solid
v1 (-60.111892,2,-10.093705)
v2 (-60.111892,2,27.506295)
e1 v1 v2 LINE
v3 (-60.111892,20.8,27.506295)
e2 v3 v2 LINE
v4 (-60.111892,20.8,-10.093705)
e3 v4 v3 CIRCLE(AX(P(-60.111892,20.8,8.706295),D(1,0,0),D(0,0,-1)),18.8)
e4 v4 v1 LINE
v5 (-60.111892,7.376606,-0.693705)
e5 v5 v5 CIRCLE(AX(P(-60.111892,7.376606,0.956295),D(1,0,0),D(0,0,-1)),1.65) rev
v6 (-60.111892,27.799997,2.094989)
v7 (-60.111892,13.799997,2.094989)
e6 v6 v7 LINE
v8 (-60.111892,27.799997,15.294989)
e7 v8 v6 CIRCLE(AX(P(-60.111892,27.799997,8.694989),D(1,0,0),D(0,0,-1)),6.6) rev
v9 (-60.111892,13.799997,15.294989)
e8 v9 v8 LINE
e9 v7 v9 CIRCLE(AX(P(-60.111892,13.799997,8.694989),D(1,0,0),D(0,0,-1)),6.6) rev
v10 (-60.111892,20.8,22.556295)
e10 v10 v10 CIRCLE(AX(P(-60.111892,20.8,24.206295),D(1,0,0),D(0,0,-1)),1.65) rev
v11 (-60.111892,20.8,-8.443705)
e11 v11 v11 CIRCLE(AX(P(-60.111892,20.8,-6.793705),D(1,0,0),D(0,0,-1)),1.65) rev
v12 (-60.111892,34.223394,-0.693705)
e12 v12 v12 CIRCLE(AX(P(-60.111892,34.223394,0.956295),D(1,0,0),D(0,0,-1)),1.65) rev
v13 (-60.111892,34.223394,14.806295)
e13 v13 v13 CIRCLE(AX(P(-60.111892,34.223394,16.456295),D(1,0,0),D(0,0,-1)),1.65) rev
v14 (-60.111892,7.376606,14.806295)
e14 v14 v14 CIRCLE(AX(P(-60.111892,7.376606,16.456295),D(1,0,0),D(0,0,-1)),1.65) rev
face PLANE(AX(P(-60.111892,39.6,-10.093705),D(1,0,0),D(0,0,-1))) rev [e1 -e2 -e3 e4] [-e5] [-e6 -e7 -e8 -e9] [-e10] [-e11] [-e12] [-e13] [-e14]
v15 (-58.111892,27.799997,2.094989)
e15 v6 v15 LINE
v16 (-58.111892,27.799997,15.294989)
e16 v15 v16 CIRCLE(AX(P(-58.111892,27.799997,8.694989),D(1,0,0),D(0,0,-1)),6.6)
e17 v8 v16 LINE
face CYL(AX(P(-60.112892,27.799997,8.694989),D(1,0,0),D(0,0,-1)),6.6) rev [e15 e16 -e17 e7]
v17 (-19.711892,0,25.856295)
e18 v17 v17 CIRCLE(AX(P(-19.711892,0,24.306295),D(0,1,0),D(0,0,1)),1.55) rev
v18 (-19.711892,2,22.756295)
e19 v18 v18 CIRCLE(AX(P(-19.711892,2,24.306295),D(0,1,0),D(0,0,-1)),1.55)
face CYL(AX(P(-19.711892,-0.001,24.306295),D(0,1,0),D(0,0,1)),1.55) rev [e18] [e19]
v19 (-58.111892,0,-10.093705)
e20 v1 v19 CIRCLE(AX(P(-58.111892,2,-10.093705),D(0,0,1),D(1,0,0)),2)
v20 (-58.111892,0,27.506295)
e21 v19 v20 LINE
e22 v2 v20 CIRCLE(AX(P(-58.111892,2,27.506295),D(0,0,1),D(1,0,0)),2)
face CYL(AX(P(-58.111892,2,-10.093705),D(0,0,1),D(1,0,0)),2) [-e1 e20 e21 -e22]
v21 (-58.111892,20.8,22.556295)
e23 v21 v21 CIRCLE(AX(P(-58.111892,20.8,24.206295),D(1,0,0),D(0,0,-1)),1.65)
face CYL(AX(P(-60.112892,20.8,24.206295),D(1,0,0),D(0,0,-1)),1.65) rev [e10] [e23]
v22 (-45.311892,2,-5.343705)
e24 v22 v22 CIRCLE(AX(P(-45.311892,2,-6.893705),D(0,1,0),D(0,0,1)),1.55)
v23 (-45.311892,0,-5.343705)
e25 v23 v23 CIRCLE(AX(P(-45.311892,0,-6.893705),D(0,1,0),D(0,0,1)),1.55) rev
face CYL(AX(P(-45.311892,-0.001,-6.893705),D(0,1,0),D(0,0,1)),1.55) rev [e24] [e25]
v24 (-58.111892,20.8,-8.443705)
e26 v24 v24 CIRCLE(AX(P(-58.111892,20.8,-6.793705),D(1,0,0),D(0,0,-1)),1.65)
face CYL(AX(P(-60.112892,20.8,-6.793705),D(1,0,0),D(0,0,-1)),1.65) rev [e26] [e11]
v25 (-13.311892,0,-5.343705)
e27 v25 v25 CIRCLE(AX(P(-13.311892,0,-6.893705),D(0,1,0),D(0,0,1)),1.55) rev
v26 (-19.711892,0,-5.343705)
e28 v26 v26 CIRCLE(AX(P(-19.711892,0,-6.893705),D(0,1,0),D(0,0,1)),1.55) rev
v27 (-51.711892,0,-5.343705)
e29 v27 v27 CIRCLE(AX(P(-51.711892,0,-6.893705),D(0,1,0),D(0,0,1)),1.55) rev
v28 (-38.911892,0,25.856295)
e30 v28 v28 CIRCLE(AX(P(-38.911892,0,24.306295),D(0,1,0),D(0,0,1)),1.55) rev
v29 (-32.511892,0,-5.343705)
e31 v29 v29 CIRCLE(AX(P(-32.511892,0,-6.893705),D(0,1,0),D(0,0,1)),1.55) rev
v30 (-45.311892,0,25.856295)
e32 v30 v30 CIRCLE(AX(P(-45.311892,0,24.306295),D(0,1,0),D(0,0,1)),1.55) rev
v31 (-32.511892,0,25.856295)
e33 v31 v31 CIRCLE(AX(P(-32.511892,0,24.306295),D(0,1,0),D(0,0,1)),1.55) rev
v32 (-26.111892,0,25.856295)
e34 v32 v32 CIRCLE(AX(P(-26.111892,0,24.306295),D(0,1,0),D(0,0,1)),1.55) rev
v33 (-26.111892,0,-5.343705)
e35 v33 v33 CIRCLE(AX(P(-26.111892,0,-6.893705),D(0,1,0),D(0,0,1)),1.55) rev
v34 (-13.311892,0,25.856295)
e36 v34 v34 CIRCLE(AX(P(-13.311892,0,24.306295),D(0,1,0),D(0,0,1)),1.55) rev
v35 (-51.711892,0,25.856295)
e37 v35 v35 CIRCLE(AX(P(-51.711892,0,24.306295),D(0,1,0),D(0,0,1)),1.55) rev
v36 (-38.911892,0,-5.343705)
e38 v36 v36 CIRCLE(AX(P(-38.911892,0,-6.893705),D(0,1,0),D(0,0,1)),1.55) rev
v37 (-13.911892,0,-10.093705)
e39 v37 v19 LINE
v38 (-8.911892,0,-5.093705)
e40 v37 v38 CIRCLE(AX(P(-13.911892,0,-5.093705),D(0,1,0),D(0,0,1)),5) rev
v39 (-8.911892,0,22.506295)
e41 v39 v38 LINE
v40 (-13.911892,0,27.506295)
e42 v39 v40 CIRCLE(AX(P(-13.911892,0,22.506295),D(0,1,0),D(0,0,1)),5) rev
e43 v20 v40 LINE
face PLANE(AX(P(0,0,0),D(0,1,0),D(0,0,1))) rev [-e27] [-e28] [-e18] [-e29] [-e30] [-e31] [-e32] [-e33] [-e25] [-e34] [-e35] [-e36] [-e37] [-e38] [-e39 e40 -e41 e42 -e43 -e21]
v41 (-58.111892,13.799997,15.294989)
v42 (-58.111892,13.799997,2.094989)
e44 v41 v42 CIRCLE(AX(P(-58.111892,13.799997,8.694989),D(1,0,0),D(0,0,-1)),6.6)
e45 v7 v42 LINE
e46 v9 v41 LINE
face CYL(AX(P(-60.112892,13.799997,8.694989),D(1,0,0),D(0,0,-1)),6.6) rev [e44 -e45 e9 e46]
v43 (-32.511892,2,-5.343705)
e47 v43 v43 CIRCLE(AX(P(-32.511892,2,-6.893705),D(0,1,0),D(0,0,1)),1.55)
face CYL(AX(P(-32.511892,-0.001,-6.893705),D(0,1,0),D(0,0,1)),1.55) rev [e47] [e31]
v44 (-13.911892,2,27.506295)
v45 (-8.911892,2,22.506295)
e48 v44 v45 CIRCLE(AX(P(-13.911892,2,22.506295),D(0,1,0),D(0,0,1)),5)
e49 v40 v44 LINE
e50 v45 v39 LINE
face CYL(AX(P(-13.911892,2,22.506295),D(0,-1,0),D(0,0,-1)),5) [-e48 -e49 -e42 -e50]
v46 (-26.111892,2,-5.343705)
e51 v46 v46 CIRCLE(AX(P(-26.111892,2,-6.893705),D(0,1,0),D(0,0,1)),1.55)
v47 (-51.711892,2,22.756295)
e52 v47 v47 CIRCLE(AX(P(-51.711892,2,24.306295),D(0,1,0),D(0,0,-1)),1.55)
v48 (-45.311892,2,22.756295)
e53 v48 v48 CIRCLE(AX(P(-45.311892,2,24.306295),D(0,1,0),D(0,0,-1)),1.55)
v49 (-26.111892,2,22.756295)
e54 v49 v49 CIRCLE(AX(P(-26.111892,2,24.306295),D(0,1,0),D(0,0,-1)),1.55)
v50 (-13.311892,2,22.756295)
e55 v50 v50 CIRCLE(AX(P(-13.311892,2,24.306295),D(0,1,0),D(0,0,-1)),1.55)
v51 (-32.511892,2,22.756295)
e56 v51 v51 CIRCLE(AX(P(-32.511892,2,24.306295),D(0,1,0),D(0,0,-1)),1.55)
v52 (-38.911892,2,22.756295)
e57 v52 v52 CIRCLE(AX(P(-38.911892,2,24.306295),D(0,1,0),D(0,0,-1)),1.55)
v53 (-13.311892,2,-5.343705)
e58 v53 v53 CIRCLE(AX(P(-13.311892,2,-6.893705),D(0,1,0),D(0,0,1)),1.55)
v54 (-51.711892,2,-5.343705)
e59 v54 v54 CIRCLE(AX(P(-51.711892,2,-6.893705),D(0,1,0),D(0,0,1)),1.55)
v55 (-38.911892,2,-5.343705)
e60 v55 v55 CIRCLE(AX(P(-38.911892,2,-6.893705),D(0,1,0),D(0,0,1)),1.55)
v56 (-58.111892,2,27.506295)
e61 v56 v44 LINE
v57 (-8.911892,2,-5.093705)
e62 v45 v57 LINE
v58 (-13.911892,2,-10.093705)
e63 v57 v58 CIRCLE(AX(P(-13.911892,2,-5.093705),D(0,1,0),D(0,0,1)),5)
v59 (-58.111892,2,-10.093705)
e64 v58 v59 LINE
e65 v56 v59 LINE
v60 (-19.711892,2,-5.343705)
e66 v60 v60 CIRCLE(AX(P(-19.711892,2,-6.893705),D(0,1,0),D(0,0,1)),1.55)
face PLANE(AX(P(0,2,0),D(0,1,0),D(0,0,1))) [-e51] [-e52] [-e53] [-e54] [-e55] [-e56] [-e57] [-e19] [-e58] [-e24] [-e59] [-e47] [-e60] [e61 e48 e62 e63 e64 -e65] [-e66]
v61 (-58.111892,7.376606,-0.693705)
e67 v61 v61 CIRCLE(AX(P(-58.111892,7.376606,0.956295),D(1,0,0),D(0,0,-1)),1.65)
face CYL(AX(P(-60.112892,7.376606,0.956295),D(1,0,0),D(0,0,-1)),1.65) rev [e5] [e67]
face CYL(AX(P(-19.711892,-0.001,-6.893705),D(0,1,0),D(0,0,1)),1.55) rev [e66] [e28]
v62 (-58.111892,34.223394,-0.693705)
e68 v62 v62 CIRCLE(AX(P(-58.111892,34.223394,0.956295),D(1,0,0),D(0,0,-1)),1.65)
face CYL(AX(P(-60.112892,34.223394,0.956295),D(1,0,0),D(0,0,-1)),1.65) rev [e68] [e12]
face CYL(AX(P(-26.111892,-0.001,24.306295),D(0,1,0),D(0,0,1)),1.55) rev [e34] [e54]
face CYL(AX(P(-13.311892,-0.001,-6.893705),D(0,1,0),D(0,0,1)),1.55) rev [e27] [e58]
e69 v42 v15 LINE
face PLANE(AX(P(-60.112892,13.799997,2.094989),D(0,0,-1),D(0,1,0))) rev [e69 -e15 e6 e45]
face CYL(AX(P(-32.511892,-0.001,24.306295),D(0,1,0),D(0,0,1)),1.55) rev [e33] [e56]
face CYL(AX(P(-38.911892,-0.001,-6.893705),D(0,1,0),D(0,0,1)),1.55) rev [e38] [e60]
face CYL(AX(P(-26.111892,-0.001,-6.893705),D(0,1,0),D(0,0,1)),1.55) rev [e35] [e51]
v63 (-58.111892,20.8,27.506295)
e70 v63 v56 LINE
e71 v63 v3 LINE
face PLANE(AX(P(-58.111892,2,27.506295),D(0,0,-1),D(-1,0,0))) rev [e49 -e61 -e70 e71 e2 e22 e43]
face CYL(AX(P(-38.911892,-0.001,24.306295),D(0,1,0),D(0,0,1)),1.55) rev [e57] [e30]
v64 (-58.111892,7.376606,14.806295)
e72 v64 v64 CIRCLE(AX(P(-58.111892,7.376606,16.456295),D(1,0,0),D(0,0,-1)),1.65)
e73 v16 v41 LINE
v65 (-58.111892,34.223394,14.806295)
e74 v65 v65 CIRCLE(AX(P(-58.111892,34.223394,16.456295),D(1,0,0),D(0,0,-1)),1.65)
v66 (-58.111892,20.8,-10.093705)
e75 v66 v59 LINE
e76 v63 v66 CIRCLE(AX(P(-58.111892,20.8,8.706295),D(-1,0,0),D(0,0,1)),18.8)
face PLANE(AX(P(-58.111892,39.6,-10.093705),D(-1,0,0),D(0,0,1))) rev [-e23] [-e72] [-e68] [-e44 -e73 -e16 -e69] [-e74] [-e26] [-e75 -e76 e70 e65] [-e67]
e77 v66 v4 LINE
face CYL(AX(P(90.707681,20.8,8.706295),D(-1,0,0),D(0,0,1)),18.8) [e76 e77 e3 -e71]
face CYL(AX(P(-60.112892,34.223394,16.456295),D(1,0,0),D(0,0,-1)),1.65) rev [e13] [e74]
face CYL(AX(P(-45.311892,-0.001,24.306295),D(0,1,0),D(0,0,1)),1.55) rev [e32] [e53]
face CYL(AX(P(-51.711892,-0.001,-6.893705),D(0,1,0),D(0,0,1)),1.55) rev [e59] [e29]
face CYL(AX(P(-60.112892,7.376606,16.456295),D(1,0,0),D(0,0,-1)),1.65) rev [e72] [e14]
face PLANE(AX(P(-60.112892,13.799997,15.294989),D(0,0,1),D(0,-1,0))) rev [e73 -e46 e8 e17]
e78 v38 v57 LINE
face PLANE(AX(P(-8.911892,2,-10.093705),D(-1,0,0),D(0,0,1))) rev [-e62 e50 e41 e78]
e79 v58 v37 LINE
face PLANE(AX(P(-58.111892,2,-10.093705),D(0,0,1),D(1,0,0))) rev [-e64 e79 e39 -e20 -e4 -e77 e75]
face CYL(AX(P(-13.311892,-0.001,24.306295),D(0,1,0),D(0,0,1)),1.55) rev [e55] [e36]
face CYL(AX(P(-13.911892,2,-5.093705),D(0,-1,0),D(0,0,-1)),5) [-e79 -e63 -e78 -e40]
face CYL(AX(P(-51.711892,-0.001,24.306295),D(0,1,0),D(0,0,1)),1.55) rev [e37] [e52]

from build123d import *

# Parameters (mm, degrees)
SKETCH1_W           = 49.2
SKETCH1_H           = 37.6
BOSS_EXTRUDE1_DEPTH = 2
SKETCH2_W           = 2
SKETCH2_H           = 37.6
BOSS_EXTRUDE2_DEPTH = 37.6
BOSS_EXTRUDE5_DEPTH = 37.6
CUT_EXTRUDE1_REACH  = 78.051
SKETCH4_R           = 1.55
FILLET2_R           = 5
CUT_EXTRUDE2_REACH  = 70.887
SKETCH5_R           = 1.65
CUT_EXTRUDE3_START  = -2
CUT_EXTRUDE3_DEPTH  = 2
CUT_EXTRUDE4_REACH  = 70.887


# Read off the part's stored shape, not the designer's step: Cut-Extrude3
with BuildPart() as part:
    # Sketch1 → Boss-Extrude1 (new body)
    with BuildSketch(Plane(origin=(0, 0, 0), x_dir=(1, 0, 0), z_dir=(0, 1, 0))):
        with Locations((-33.511891694, -8.706295402)):
            Rectangle(SKETCH1_W, SKETCH1_H)
    extrude(amount=BOSS_EXTRUDE1_DEPTH)



with BuildPart() as body_2:
    # Sketch2 → Boss-Extrude2 (new body)
    with BuildSketch(Plane(origin=(0, 2, 0), x_dir=(1, 0, 0), z_dir=(0, 1, 0))):
        with Locations((-59.111891694, -8.706295402)):
            Rectangle(SKETCH2_W, SKETCH2_H)
    extrude(amount=BOSS_EXTRUDE2_DEPTH)


with BuildPart() as part_1:
    add(part.part)

    add(body_2.part)  # Boss-Extrude5 merges body 2
    # Sketch3 → Boss-Extrude5 (add)
    with BuildSketch(Plane.XY.offset(27.506295402)):
        with BuildLine():
            Line((-60.111891694, 2), (-58.111891694, 2))
            Line((-58.111891694, 2), (-58.111891694, 0))
            ThreePointArc((-58.111891694, 0), (-59.526105257, 0.585786438), (-60.111891694, 2))
        make_face()
    extrude(amount=-BOSS_EXTRUDE5_DEPTH)

    # Sketch4 → Cut-Extrude1 (cut, up to next)
    with BuildSketch(Plane(origin=(0, 2, 0), x_dir=(1, 0, 0), z_dir=(0, 1, 0)), mode=Mode.PRIVATE) as cut_extrude1_sk1:
        with Locations(Location((-51.711891694, 6.893704598, 0), (0, 0, 270))):
            Circle(SKETCH4_R)
    cut_extrude1_tool1 = extrude(cut_extrude1_sk1.sketch, amount=-CUT_EXTRUDE1_REACH, mode=Mode.PRIVATE) & part_1.part
    # Sketch4 → Cut-Extrude1 (cut, up to next)
    with BuildSketch(Plane(origin=(0, 2, 0), x_dir=(1, 0, 0), z_dir=(0, 1, 0)), mode=Mode.PRIVATE) as cut_extrude1_sk2:
        with Locations(Location((-51.711891694, -24.306295402, 0), (0, 0, 270))):
            Circle(SKETCH4_R)
    cut_extrude1_tool2 = extrude(cut_extrude1_sk2.sketch, amount=-CUT_EXTRUDE1_REACH, mode=Mode.PRIVATE) & part_1.part
    # Sketch4 → Cut-Extrude1 (cut, up to next)
    with BuildSketch(Plane(origin=(0, 2, 0), x_dir=(1, 0, 0), z_dir=(0, 1, 0)), mode=Mode.PRIVATE) as cut_extrude1_sk3:
        with Locations(Location((-45.311891694, 6.893704598, 0), (0, 0, 270))):
            Circle(SKETCH4_R)
    cut_extrude1_tool3 = extrude(cut_extrude1_sk3.sketch, amount=-CUT_EXTRUDE1_REACH, mode=Mode.PRIVATE) & part_1.part
    # Sketch4 → Cut-Extrude1 (cut, up to next)
    with BuildSketch(Plane(origin=(0, 2, 0), x_dir=(1, 0, 0), z_dir=(0, 1, 0)), mode=Mode.PRIVATE) as cut_extrude1_sk4:
        with Locations(Location((-38.911891694, 6.893704598, 0), (0, 0, 270))):
            Circle(SKETCH4_R)
    cut_extrude1_tool4 = extrude(cut_extrude1_sk4.sketch, amount=-CUT_EXTRUDE1_REACH, mode=Mode.PRIVATE) & part_1.part
    # Sketch4 → Cut-Extrude1 (cut, up to next)
    with BuildSketch(Plane(origin=(0, 2, 0), x_dir=(1, 0, 0), z_dir=(0, 1, 0)), mode=Mode.PRIVATE) as cut_extrude1_sk5:
        with Locations(Location((-32.511891694, 6.893704598, 0), (0, 0, 270))):
            Circle(SKETCH4_R)
    cut_extrude1_tool5 = extrude(cut_extrude1_sk5.sketch, amount=-CUT_EXTRUDE1_REACH, mode=Mode.PRIVATE) & part_1.part
    # Sketch4 → Cut-Extrude1 (cut, up to next)
    with BuildSketch(Plane(origin=(0, 2, 0), x_dir=(1, 0, 0), z_dir=(0, 1, 0)), mode=Mode.PRIVATE) as cut_extrude1_sk6:
        with Locations(Location((-26.111891694, 6.893704598, 0), (0, 0, 270))):
            Circle(SKETCH4_R)
    cut_extrude1_tool6 = extrude(cut_extrude1_sk6.sketch, amount=-CUT_EXTRUDE1_REACH, mode=Mode.PRIVATE) & part_1.part
    # Sketch4 → Cut-Extrude1 (cut, up to next)
    with BuildSketch(Plane(origin=(0, 2, 0), x_dir=(1, 0, 0), z_dir=(0, 1, 0)), mode=Mode.PRIVATE) as cut_extrude1_sk7:
        with Locations(Location((-19.711891694, 6.893704598, 0), (0, 0, 270))):
            Circle(SKETCH4_R)
    cut_extrude1_tool7 = extrude(cut_extrude1_sk7.sketch, amount=-CUT_EXTRUDE1_REACH, mode=Mode.PRIVATE) & part_1.part
    # Sketch4 → Cut-Extrude1 (cut, up to next)
    with BuildSketch(Plane(origin=(0, 2, 0), x_dir=(1, 0, 0), z_dir=(0, 1, 0)), mode=Mode.PRIVATE) as cut_extrude1_sk8:
        with Locations(Location((-13.311891694, 6.893704598, 0), (0, 0, 270))):
            Circle(SKETCH4_R)
    cut_extrude1_tool8 = extrude(cut_extrude1_sk8.sketch, amount=-CUT_EXTRUDE1_REACH, mode=Mode.PRIVATE) & part_1.part
    # Sketch4 → Cut-Extrude1 (cut, up to next)
    with BuildSketch(Plane(origin=(0, 2, 0), x_dir=(1, 0, 0), z_dir=(0, 1, 0)), mode=Mode.PRIVATE) as cut_extrude1_sk9:
        with Locations(Location((-13.311891694, -24.306295402, 0), (0, 0, 270))):
            Circle(SKETCH4_R)
    cut_extrude1_tool9 = extrude(cut_extrude1_sk9.sketch, amount=-CUT_EXTRUDE1_REACH, mode=Mode.PRIVATE) & part_1.part
    # Sketch4 → Cut-Extrude1 (cut, up to next)
    with BuildSketch(Plane(origin=(0, 2, 0), x_dir=(1, 0, 0), z_dir=(0, 1, 0)), mode=Mode.PRIVATE) as cut_extrude1_sk10:
        with Locations(Location((-19.711891694, -24.306295402, 0), (0, 0, 270))):
            Circle(SKETCH4_R)
    cut_extrude1_tool10 = extrude(cut_extrude1_sk10.sketch, amount=-CUT_EXTRUDE1_REACH, mode=Mode.PRIVATE) & part_1.part
    # Sketch4 → Cut-Extrude1 (cut, up to next)
    with BuildSketch(Plane(origin=(0, 2, 0), x_dir=(1, 0, 0), z_dir=(0, 1, 0)), mode=Mode.PRIVATE) as cut_extrude1_sk11:
        with Locations(Location((-26.111891694, -24.306295402, 0), (0, 0, 270))):
            Circle(SKETCH4_R)
    cut_extrude1_tool11 = extrude(cut_extrude1_sk11.sketch, amount=-CUT_EXTRUDE1_REACH, mode=Mode.PRIVATE) & part_1.part
    # Sketch4 → Cut-Extrude1 (cut, up to next)
    with BuildSketch(Plane(origin=(0, 2, 0), x_dir=(1, 0, 0), z_dir=(0, 1, 0)), mode=Mode.PRIVATE) as cut_extrude1_sk12:
        with Locations(Location((-32.511891694, -24.306295402, 0), (0, 0, 270))):
            Circle(SKETCH4_R)
    cut_extrude1_tool12 = extrude(cut_extrude1_sk12.sketch, amount=-CUT_EXTRUDE1_REACH, mode=Mode.PRIVATE) & part_1.part
    # Sketch4 → Cut-Extrude1 (cut, up to next)
    with BuildSketch(Plane(origin=(0, 2, 0), x_dir=(1, 0, 0), z_dir=(0, 1, 0)), mode=Mode.PRIVATE) as cut_extrude1_sk13:
        with Locations(Location((-38.911891694, -24.306295402, 0), (0, 0, 270))):
            Circle(SKETCH4_R)
    cut_extrude1_tool13 = extrude(cut_extrude1_sk13.sketch, amount=-CUT_EXTRUDE1_REACH, mode=Mode.PRIVATE) & part_1.part
    # Sketch4 → Cut-Extrude1 (cut, up to next)
    with BuildSketch(Plane(origin=(0, 2, 0), x_dir=(1, 0, 0), z_dir=(0, 1, 0)), mode=Mode.PRIVATE) as cut_extrude1_sk14:
        with Locations(Location((-45.311891694, -24.306295402, 0), (0, 0, 270))):
            Circle(SKETCH4_R)
    cut_extrude1_tool14 = extrude(cut_extrude1_sk14.sketch, amount=-CUT_EXTRUDE1_REACH, mode=Mode.PRIVATE) & part_1.part
    add(cut_extrude1_tool1.solids().sort_by_distance((-51.711892, 2, -6.893705))[0], mode=Mode.SUBTRACT)
    add(cut_extrude1_tool2.solids().sort_by_distance((-51.711892, 2, 24.306295))[0], mode=Mode.SUBTRACT)
    add(cut_extrude1_tool3.solids().sort_by_distance((-45.311892, 2, -6.893705))[0], mode=Mode.SUBTRACT)
    add(cut_extrude1_tool4.solids().sort_by_distance((-38.911892, 2, -6.893705))[0], mode=Mode.SUBTRACT)
    add(cut_extrude1_tool5.solids().sort_by_distance((-32.511892, 2, -6.893705))[0], mode=Mode.SUBTRACT)
    add(cut_extrude1_tool6.solids().sort_by_distance((-26.111892, 2, -6.893705))[0], mode=Mode.SUBTRACT)
    add(cut_extrude1_tool7.solids().sort_by_distance((-19.711892, 2, -6.893705))[0], mode=Mode.SUBTRACT)
    add(cut_extrude1_tool8.solids().sort_by_distance((-13.311892, 2, -6.893705))[0], mode=Mode.SUBTRACT)
    add(cut_extrude1_tool9.solids().sort_by_distance((-13.311892, 2, 24.306295))[0], mode=Mode.SUBTRACT)
    add(cut_extrude1_tool10.solids().sort_by_distance((-19.711892, 2, 24.306295))[0], mode=Mode.SUBTRACT)
    add(cut_extrude1_tool11.solids().sort_by_distance((-26.111892, 2, 24.306295))[0], mode=Mode.SUBTRACT)
    add(cut_extrude1_tool12.solids().sort_by_distance((-32.511892, 2, 24.306295))[0], mode=Mode.SUBTRACT)
    add(cut_extrude1_tool13.solids().sort_by_distance((-38.911892, 2, 24.306295))[0], mode=Mode.SUBTRACT)
    add(cut_extrude1_tool14.solids().sort_by_distance((-45.311892, 2, 24.306295))[0], mode=Mode.SUBTRACT)

    # Fillet2
    fillet2_edges = [part_1.edges().sort_by_distance(p)[0] for p in [
        (-8.911891694, 1, 27.506295402),
        (-8.911891694, 1, -10.093704598),
    ]]
    fillet(fillet2_edges, radius=FILLET2_R)

    # Sketch5 → Cut-Extrude2 (cut, up to next)
    with BuildSketch(Plane(origin=(-58.111891694, 0, 0), x_dir=(0, 0, -1), z_dir=(1, 0, 0)), mode=Mode.PRIVATE) as cut_extrude2_sk1:
        with Locations((6.793704598, 20.8)):
            Circle(SKETCH5_R)
    cut_extrude2_tool1 = extrude(cut_extrude2_sk1.sketch, amount=-CUT_EXTRUDE2_REACH, mode=Mode.PRIVATE) & part_1.part
    # Sketch5 → Cut-Extrude2 (cut, up to next)
    with BuildSketch(Plane(origin=(-58.111891694, 0, 0), x_dir=(0, 0, -1), z_dir=(1, 0, 0)), mode=Mode.PRIVATE) as cut_extrude2_sk2:
        with Locations((-0.956295402, 7.376606241)):
            Circle(SKETCH5_R)
    cut_extrude2_tool2 = extrude(cut_extrude2_sk2.sketch, amount=-CUT_EXTRUDE2_REACH, mode=Mode.PRIVATE) & part_1.part
    # Sketch5 → Cut-Extrude2 (cut, up to next)
    with BuildSketch(Plane(origin=(-58.111891694, 0, 0), x_dir=(0, 0, -1), z_dir=(1, 0, 0)), mode=Mode.PRIVATE) as cut_extrude2_sk3:
        with Locations((-16.456295402, 7.376606241)):
            Circle(SKETCH5_R)
    cut_extrude2_tool3 = extrude(cut_extrude2_sk3.sketch, amount=-CUT_EXTRUDE2_REACH, mode=Mode.PRIVATE) & part_1.part
    # Sketch5 → Cut-Extrude2 (cut, up to next)
    with BuildSketch(Plane(origin=(-58.111891694, 0, 0), x_dir=(0, 0, -1), z_dir=(1, 0, 0)), mode=Mode.PRIVATE) as cut_extrude2_sk4:
        with Locations((-24.206295402, 20.8)):
            Circle(SKETCH5_R)
    cut_extrude2_tool4 = extrude(cut_extrude2_sk4.sketch, amount=-CUT_EXTRUDE2_REACH, mode=Mode.PRIVATE) & part_1.part
    # Sketch5 → Cut-Extrude2 (cut, up to next)
    with BuildSketch(Plane(origin=(-58.111891694, 0, 0), x_dir=(0, 0, -1), z_dir=(1, 0, 0)), mode=Mode.PRIVATE) as cut_extrude2_sk5:
        with Locations((-16.456295402, 34.223393759)):
            Circle(SKETCH5_R)
    cut_extrude2_tool5 = extrude(cut_extrude2_sk5.sketch, amount=-CUT_EXTRUDE2_REACH, mode=Mode.PRIVATE) & part_1.part
    # Sketch5 → Cut-Extrude2 (cut, up to next)
    with BuildSketch(Plane(origin=(-58.111891694, 0, 0), x_dir=(0, 0, -1), z_dir=(1, 0, 0)), mode=Mode.PRIVATE) as cut_extrude2_sk6:
        with Locations((-0.956295402, 34.223393759)):
            Circle(SKETCH5_R)
    cut_extrude2_tool6 = extrude(cut_extrude2_sk6.sketch, amount=-CUT_EXTRUDE2_REACH, mode=Mode.PRIVATE) & part_1.part
    add(cut_extrude2_tool1.solids().sort_by_distance((-58.111892, 20.8, -6.793705))[0], mode=Mode.SUBTRACT)
    add(cut_extrude2_tool2.solids().sort_by_distance((-58.111892, 7.376606, 0.956295))[0], mode=Mode.SUBTRACT)
    add(cut_extrude2_tool3.solids().sort_by_distance((-58.111892, 7.376606, 16.456295))[0], mode=Mode.SUBTRACT)
    add(cut_extrude2_tool4.solids().sort_by_distance((-58.111892, 20.8, 24.206295))[0], mode=Mode.SUBTRACT)
    add(cut_extrude2_tool5.solids().sort_by_distance((-58.111892, 34.223394, 16.456295))[0], mode=Mode.SUBTRACT)
    add(cut_extrude2_tool6.solids().sort_by_distance((-58.111892, 34.223394, 0.956295))[0], mode=Mode.SUBTRACT)

    # Cut-Extrude3 outline → Cut-Extrude3 (cut)
    with BuildSketch(Plane(origin=(-58.111891694, 0, 0), x_dir=(0, 0, -1), z_dir=(1, 0, 0)).offset(CUT_EXTRUDE3_START)):
        with BuildLine():
            Line((-27.506295402, 39.6), (-27.506295402, 20.8))
            ThreePointArc((-27.506295402, 20.8), (-21.999902888, 34.093607486), (-8.706295402, 39.6))
            Line((-8.706295402, 39.6), (-27.506295402, 39.6))
        make_face()
        with BuildLine():
            Line((10.093704598, 39.6), (-8.706295402, 39.6))
            ThreePointArc((-8.706295402, 39.6), (4.587312084, 34.093607486), (10.093704598, 20.8))
            Line((10.093704598, 20.8), (10.093704598, 39.6))
        make_face()
    extrude(amount=CUT_EXTRUDE3_DEPTH, mode=Mode.SUBTRACT)

    # Sketch8 → Cut-Extrude4 (cut, up to next)
    with BuildSketch(Plane(origin=(-58.111891694, 0, 0), x_dir=(0, 0, -1), z_dir=(1, 0, 0)), mode=Mode.PRIVATE) as cut_extrude4_sk1:
        with BuildLine():
            Line((-15.294989136, 13.7999966), (-15.294989136, 27.7999966))
            ThreePointArc((-15.294989136, 27.7999966), (-8.694989136, 34.3999966), (-2.094989136, 27.7999966))
            Line((-2.094989136, 27.7999966), (-2.094989136, 13.7999966))
            ThreePointArc((-2.094989136, 13.7999966), (-8.694989136, 7.1999966), (-15.294989136, 13.7999966))
        make_face()
    cut_extrude4_tool1 = extrude(cut_extrude4_sk1.sketch, amount=-CUT_EXTRUDE4_REACH, mode=Mode.PRIVATE) & part_1.part
    add(cut_extrude4_tool1.solids().sort_by_distance((-58.111892, 20.799997, 8.694989))[0], mode=Mode.SUBTRACT)


solid = part_1.part
